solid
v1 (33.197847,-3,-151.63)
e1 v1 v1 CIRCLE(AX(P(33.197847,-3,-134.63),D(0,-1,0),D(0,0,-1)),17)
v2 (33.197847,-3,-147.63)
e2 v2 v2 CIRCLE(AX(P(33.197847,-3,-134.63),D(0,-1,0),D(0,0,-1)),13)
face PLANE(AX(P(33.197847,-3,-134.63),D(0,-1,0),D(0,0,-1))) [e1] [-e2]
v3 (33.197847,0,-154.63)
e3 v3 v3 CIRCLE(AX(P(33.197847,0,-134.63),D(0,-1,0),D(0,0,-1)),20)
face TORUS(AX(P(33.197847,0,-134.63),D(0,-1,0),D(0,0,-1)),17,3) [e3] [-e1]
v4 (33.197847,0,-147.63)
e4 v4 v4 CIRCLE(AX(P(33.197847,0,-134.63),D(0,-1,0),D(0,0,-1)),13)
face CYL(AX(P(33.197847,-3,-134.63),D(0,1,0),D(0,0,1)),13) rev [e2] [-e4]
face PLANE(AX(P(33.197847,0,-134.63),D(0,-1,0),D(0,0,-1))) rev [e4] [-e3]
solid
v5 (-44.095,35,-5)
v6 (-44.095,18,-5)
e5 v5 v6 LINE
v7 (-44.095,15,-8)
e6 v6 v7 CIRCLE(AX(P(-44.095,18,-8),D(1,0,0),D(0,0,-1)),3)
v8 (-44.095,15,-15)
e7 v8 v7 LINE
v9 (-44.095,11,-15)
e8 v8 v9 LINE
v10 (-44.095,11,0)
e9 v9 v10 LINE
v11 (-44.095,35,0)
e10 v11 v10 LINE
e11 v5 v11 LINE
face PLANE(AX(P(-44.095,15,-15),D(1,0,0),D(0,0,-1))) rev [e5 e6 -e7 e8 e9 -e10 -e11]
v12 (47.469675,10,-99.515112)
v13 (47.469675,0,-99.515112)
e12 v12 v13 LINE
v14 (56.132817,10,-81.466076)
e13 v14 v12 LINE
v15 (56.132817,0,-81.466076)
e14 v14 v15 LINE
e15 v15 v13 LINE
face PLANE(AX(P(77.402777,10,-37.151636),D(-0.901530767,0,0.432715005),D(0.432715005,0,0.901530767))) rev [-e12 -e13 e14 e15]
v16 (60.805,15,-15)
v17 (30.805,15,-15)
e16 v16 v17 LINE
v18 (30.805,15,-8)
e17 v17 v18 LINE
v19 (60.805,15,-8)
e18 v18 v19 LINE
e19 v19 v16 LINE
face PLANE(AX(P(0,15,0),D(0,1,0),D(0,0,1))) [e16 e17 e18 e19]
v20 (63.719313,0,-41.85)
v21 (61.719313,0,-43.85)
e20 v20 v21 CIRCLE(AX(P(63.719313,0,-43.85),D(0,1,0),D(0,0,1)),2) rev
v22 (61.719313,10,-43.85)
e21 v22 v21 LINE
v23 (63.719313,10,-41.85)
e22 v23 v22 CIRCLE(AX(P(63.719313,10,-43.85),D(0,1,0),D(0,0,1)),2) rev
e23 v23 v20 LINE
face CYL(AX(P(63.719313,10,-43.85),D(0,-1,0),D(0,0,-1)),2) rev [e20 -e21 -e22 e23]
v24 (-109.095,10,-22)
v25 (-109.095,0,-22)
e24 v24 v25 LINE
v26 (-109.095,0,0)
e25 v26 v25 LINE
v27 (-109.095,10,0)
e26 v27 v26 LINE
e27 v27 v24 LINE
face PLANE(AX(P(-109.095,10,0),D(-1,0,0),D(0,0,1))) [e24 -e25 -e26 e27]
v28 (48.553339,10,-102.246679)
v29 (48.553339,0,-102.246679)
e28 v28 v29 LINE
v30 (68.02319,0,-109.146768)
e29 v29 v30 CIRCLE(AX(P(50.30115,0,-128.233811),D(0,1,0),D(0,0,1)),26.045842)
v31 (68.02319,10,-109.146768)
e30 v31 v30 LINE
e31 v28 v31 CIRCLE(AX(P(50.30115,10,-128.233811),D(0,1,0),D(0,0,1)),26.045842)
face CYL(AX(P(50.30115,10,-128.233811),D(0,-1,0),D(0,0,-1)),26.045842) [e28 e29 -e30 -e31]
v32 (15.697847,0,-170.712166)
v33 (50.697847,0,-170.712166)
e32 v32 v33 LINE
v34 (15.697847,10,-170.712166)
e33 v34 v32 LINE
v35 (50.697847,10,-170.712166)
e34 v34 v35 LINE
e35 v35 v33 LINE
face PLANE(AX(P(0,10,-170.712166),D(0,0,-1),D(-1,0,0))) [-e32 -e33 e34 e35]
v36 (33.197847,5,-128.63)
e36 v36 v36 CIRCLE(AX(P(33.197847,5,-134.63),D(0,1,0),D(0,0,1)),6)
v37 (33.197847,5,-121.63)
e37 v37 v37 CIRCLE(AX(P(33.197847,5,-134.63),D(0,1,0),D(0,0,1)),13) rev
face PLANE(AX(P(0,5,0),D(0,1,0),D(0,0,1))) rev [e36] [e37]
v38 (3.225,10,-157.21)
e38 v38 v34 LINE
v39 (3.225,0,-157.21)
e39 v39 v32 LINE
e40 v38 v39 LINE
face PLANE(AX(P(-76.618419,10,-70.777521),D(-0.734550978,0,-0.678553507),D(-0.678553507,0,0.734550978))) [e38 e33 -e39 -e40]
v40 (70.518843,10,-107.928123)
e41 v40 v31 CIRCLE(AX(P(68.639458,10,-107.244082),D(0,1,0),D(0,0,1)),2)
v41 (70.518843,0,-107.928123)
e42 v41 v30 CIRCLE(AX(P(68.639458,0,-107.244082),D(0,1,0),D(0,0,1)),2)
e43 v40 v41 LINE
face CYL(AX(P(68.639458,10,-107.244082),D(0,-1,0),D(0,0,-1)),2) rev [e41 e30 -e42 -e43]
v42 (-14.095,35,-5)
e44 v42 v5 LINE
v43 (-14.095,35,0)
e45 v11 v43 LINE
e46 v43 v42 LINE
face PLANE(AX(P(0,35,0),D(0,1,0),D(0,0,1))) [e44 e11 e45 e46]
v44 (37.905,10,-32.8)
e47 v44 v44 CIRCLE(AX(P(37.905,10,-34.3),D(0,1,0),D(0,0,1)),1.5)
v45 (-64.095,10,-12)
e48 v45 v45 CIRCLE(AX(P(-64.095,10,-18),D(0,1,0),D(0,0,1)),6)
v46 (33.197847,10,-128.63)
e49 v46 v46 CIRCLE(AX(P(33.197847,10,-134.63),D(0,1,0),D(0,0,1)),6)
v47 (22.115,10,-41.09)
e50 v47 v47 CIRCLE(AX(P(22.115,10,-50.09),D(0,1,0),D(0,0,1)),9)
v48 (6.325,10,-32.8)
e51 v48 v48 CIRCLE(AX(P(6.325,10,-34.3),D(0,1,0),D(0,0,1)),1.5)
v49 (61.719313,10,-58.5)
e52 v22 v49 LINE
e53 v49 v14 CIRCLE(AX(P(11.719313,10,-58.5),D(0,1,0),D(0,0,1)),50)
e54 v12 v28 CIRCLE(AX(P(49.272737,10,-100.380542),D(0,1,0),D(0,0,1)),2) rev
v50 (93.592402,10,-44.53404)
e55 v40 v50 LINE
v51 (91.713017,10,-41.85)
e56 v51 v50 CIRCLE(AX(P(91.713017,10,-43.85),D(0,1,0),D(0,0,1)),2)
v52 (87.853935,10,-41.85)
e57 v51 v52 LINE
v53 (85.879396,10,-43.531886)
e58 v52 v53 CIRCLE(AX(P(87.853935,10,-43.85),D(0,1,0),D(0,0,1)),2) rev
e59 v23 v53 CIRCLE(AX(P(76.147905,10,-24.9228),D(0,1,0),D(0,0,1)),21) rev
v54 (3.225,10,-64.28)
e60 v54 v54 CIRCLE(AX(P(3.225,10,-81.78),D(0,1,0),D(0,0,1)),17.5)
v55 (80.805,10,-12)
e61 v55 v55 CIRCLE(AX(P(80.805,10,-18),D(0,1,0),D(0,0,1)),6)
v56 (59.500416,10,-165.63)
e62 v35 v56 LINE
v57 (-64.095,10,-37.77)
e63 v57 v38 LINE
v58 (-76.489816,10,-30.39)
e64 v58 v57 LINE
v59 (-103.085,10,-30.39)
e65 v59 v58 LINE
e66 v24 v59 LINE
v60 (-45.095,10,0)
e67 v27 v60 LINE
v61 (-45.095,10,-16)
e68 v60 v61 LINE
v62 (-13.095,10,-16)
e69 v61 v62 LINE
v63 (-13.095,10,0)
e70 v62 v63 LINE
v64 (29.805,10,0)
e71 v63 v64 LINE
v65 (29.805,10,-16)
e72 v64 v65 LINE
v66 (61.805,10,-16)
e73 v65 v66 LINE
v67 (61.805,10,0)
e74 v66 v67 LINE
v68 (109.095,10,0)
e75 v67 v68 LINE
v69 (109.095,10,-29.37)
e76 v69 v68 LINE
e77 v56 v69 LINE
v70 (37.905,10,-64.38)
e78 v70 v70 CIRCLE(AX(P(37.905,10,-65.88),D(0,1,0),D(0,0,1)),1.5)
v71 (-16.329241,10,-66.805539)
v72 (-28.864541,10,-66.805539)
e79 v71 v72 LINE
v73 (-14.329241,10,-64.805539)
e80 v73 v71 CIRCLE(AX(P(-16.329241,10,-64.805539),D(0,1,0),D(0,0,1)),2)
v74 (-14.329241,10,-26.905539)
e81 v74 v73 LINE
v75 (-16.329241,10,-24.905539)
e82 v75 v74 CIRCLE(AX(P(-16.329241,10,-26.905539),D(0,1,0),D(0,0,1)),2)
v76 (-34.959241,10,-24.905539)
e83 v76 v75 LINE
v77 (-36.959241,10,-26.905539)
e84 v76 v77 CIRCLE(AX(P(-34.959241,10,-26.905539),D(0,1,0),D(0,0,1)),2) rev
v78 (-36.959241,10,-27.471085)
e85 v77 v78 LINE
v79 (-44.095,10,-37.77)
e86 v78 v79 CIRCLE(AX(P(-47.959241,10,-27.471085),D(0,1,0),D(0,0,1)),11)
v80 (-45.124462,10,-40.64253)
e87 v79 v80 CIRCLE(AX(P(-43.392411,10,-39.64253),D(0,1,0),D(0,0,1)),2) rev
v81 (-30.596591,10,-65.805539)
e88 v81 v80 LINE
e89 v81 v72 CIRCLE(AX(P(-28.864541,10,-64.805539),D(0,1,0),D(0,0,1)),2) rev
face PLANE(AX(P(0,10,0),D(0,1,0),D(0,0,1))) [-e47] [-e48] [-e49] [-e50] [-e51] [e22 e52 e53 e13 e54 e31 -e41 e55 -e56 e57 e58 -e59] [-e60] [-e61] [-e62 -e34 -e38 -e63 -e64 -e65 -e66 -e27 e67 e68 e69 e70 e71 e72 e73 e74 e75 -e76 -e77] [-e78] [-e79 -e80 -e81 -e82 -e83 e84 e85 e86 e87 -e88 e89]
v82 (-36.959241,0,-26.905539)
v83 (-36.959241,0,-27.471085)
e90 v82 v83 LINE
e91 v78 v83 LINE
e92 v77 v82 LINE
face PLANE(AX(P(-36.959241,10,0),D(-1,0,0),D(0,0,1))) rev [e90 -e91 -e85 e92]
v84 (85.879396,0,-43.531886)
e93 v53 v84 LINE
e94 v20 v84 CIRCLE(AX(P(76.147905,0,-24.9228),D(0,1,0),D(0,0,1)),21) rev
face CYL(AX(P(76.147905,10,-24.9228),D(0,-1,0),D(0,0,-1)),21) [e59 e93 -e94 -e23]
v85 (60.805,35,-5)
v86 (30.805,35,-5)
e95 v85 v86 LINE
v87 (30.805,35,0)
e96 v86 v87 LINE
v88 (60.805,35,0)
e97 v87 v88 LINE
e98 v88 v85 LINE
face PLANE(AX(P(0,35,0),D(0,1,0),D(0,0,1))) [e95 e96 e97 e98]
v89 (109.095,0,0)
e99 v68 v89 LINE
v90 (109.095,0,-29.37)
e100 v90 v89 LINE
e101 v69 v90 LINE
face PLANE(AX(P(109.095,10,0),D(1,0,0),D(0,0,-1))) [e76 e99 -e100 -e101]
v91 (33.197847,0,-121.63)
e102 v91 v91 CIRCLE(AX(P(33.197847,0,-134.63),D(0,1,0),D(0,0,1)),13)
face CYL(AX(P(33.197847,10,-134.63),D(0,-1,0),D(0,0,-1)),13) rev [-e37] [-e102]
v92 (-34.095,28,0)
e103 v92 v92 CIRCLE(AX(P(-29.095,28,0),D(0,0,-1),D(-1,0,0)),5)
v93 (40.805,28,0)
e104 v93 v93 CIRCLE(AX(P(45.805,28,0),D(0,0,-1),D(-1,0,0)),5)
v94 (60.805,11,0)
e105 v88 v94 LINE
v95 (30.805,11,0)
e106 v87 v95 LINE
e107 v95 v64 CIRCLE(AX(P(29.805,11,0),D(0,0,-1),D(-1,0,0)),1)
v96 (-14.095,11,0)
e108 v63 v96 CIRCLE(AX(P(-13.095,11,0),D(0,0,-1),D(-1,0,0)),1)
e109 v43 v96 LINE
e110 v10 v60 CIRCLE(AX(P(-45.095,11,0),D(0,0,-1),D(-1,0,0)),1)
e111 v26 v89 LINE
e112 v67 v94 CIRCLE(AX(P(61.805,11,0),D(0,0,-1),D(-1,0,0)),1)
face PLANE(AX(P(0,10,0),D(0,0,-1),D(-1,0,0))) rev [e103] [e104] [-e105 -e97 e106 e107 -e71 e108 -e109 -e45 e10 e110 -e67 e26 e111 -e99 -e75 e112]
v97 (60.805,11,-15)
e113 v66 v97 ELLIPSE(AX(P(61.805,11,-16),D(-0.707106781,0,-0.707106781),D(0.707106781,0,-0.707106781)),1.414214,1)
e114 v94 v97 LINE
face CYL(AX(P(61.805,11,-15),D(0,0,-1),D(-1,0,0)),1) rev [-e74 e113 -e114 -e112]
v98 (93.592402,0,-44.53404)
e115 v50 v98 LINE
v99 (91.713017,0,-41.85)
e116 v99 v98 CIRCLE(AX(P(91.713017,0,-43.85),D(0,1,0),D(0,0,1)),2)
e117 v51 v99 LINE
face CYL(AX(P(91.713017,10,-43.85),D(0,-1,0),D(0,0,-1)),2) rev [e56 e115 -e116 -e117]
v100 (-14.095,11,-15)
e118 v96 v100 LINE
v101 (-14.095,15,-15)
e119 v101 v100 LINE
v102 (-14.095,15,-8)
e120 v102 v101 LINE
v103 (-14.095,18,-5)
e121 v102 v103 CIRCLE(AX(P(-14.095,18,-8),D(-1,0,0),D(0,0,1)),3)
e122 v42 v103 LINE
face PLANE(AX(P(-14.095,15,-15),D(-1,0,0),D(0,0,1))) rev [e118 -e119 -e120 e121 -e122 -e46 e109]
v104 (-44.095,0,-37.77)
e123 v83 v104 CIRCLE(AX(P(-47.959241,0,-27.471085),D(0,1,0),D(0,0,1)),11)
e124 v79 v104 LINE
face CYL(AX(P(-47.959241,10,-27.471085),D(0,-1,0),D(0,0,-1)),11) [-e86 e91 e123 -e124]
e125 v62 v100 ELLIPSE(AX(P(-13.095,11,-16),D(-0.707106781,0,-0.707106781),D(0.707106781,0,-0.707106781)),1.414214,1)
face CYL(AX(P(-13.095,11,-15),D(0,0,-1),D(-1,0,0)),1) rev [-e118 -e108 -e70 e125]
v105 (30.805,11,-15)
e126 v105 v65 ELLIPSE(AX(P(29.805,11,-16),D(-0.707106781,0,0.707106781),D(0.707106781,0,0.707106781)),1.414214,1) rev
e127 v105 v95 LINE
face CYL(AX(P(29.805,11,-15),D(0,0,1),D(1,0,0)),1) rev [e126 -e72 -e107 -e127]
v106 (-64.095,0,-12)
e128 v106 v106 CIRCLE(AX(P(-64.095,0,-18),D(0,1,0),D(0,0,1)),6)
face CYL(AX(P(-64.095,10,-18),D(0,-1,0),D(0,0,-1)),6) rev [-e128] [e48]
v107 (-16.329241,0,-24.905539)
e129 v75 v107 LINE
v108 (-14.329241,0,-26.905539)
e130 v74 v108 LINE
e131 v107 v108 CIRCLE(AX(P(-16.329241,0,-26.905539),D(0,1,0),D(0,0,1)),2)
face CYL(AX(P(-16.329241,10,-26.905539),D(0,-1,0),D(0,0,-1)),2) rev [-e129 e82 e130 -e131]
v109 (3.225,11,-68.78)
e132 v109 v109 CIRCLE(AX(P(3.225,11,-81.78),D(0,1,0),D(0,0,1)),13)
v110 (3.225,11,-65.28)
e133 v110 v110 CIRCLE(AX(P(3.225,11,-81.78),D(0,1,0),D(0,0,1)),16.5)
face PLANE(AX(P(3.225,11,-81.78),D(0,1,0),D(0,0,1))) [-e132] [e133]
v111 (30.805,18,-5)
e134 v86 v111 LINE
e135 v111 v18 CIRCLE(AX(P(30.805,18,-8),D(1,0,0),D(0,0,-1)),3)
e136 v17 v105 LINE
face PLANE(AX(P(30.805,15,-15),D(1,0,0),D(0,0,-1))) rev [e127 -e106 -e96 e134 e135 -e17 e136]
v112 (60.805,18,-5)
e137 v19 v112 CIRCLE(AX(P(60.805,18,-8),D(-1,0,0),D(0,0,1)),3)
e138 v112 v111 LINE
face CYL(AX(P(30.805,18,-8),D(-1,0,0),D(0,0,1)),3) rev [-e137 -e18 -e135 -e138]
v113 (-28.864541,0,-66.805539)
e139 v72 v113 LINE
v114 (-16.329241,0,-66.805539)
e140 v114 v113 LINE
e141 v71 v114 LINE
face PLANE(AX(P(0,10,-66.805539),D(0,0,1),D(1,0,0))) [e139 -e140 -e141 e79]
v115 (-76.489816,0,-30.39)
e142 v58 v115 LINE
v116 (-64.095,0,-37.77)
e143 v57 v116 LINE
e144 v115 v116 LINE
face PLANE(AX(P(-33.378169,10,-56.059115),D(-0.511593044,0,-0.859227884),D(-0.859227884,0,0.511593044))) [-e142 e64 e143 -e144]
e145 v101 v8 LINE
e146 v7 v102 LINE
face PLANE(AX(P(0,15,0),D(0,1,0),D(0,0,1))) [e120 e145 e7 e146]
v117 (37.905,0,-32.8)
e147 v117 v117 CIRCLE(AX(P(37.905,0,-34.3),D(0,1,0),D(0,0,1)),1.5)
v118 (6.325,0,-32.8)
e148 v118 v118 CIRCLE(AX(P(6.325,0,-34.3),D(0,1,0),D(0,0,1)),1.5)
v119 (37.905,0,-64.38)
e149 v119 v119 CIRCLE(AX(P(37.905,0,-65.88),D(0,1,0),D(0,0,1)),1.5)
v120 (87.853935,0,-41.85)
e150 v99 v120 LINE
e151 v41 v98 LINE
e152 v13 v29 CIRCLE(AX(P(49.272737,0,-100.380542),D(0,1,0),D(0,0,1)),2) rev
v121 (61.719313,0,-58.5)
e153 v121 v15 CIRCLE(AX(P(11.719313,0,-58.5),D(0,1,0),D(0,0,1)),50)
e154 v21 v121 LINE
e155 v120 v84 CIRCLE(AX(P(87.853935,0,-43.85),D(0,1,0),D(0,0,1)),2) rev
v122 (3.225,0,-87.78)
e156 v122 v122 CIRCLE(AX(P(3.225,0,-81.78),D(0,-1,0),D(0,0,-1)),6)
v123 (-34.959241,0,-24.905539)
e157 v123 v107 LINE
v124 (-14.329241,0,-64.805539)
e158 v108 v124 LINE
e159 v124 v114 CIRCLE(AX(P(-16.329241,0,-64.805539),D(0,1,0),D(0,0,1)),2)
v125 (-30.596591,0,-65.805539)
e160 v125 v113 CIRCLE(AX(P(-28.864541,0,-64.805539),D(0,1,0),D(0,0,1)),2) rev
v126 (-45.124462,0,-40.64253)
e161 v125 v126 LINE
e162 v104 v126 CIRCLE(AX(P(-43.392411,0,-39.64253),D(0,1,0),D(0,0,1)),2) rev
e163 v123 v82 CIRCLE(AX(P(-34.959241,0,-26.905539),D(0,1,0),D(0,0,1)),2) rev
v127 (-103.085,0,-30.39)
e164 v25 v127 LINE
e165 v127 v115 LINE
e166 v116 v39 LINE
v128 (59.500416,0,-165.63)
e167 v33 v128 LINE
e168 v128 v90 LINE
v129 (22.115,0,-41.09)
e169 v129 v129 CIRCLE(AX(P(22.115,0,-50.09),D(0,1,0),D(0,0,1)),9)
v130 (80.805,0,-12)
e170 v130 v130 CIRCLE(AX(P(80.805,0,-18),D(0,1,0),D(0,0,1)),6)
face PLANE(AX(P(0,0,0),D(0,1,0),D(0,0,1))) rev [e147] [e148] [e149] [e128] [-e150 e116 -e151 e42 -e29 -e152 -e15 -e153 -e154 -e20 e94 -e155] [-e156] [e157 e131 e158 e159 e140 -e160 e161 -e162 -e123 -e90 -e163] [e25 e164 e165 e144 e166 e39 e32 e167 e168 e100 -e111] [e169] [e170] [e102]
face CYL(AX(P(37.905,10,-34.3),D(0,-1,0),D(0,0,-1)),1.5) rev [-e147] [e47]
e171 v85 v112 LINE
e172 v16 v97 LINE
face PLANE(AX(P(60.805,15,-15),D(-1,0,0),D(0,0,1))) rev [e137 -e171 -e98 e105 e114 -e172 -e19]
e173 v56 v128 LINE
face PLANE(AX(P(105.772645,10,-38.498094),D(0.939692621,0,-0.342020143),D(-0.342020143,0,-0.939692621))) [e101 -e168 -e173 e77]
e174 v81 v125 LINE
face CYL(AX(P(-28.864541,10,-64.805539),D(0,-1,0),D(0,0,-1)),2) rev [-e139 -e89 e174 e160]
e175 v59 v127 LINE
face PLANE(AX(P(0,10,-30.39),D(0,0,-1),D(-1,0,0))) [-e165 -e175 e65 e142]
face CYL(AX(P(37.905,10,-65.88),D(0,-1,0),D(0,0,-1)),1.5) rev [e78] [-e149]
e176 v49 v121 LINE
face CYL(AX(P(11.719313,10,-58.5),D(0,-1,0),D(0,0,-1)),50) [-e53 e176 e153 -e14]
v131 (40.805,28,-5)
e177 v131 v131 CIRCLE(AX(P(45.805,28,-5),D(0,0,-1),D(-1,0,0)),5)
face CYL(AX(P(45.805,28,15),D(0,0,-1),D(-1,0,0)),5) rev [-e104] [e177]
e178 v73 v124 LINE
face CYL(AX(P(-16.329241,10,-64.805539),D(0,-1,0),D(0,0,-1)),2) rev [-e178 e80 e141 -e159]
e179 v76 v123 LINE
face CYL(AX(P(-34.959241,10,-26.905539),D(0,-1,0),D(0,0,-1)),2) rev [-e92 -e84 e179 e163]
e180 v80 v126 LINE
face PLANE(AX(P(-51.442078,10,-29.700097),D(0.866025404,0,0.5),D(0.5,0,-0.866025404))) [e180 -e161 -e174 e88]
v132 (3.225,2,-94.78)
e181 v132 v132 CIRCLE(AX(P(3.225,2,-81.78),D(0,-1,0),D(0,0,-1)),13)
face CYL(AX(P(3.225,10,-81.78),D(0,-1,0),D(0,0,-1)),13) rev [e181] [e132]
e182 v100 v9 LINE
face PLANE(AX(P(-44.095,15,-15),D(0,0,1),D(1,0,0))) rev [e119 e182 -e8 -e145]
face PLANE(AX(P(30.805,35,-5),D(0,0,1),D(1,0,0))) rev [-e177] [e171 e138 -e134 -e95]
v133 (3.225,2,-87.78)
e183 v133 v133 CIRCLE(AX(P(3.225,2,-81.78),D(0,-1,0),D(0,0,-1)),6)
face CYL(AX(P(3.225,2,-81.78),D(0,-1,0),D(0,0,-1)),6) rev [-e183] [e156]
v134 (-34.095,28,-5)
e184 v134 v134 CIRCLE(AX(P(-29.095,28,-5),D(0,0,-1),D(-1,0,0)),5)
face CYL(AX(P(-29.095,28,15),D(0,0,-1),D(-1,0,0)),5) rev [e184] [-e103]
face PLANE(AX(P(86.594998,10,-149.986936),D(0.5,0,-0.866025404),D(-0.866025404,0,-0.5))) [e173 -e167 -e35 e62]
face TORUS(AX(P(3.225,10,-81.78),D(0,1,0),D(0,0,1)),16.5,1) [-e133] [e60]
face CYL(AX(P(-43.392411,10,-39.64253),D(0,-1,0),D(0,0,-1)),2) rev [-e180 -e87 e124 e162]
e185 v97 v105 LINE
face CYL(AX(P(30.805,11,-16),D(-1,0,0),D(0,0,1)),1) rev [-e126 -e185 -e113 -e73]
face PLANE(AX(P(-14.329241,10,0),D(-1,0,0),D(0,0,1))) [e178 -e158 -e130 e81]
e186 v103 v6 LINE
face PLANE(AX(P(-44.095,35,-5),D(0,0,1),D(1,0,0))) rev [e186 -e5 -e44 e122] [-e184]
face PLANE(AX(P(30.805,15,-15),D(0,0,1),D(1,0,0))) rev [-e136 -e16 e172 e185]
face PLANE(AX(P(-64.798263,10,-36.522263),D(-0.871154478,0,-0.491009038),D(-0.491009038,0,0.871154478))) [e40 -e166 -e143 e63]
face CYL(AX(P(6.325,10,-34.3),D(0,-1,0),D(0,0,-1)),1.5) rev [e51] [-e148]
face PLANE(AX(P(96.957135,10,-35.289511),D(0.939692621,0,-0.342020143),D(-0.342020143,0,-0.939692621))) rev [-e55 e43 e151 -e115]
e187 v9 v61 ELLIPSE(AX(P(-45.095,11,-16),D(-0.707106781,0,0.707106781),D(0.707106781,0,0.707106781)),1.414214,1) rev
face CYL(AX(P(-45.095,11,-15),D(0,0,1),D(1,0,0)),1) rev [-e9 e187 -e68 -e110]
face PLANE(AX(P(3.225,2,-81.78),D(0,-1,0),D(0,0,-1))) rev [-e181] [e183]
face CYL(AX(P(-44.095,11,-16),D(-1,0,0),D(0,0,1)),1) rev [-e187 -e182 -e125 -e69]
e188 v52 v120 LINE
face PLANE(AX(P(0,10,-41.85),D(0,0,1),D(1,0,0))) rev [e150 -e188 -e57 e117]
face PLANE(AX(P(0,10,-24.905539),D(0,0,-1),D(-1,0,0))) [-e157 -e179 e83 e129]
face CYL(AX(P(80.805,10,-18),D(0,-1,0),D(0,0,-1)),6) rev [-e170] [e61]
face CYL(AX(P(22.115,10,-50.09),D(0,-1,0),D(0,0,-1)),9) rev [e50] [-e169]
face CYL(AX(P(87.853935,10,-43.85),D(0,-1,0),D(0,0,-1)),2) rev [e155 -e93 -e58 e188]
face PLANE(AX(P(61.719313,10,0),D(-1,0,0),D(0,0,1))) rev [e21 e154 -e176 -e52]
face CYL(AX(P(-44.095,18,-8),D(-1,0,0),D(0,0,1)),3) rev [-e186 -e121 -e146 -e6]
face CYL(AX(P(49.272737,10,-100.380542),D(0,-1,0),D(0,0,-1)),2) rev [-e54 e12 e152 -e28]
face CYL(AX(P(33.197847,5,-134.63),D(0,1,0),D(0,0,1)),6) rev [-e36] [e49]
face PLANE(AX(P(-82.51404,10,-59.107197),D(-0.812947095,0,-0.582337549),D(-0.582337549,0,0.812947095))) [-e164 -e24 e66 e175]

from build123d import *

# Parameters (mm, degrees)
CROQUIS1_R              = 13
CROQUIS1_R_2            = 6
CROQUIS1_R_3            = 9
CROQUIS1_R_4            = 1.5
SALIENTE_EXTRUIR1_DEPTH = 10
CROQUIS2_W              = 30
CROQUIS2_H              = 15
SALIENTE_EXTRUIR2_DEPTH = 5
CROQUIS3_W              = 30
CROQUIS3_H              = 5
SALIENTE_EXTRUIR3_DEPTH = 20
CROQUIS4_R              = 5
CORTAR_EXTRUIR1_DEPTH   = 20
REDONDEO1_R             = 1
REDONDEO2_R             = 1
REDONDEO3_R             = 3
SALIENTE_EXTRUIR4_START = -5
CROQUIS6_R              = 13
CROQUIS6_R_2            = 6
SALIENTE_EXTRUIR4_DEPTH = 5
CROQUIS7_R              = 20
CROQUIS7_R_2            = 13
SALIENTE_EXTRUIR6_DEPTH = 3
REDONDEO5_R             = 3
CROQUIS8_R              = 13
CROQUIS8_R_2            = 6
SALIENTE_EXTRUIR7_DEPTH = 2
CROQUIS9_R              = 17.5
CROQUIS9_R_2            = 13
SALIENTE_EXTRUIR8_DEPTH = 1
REDONDEO6_R             = 1


with BuildPart() as part:
    # Croquis1 → Saliente-Extruir1 (new body)
    with BuildSketch(Plane(origin=(0, 0, 0), x_dir=(1, 0, 0), z_dir=(0, 1, 0))):
        Polygon((-109.095, 0), (109.095, 0), (109.095, 29.37), (59.500415879, 165.63), (50.697846821, 170.712165615), (15.697846821, 170.712165615), (3.225, 157.21), (-64.095, 37.77), (-76.489816261, 30.39), (-103.085, 30.39), (-109.095, 22), align=None)
        with Locations(Location((33.197846821, 134.63, 0), (0, 0, 270))):
            Circle(CROQUIS1_R, mode=Mode.SUBTRACT)
        with Locations(Location((3.225, 81.78, 0), (0, 0, 270))):
            Circle(CROQUIS1_R, mode=Mode.SUBTRACT)
        with Locations(Location((-64.095, 18, 0), (0, 0, 270))):
            Circle(CROQUIS1_R_2, mode=Mode.SUBTRACT)
        with Locations(Location((80.805, 18, 0), (0, 0, 270))):
            Circle(CROQUIS1_R_2, mode=Mode.SUBTRACT)
        with Locations(Location((22.115, 50.09, 0), (0, 0, 270))):
            Circle(CROQUIS1_R_3, mode=Mode.SUBTRACT)
        with Locations(Location((37.905, 65.88, 0), (0, 0, 270))):
            Circle(CROQUIS1_R_4, mode=Mode.SUBTRACT)
        with Locations(Location((37.905, 34.3, 0), (0, 0, 270))):
            Circle(CROQUIS1_R_4, mode=Mode.SUBTRACT)
        with Locations(Location((6.325, 34.3, 0), (0, 0, 270))):
            Circle(CROQUIS1_R_4, mode=Mode.SUBTRACT)
        with BuildLine():
            Line((-34.959241143, 24.905539046), (-16.329241143, 24.905539046))
            ThreePointArc((-16.329241143, 24.905539046), (-14.915027581, 25.491325484), (-14.329241143, 26.905539046))
            Line((-14.329241143, 26.905539046), (-14.329241143, 64.805539046))
            ThreePointArc((-14.329241143, 64.805539046), (-14.915027581, 66.219752609), (-16.329241143, 66.805539046))
            Line((-16.329241143, 66.805539046), (-28.864540605, 66.805539046))
            ThreePointArc((-28.864540605, 66.805539046), (-29.864540605, 66.537589854), (-30.596591412, 65.805539046))
            Line((-30.596591412, 65.805539046), (-45.124461509, 40.642529914))
            ThreePointArc((-45.124461509, 40.642529914), (-45.275154746, 38.967789325), (-44.095, 37.77))
            ThreePointArc((-44.095, 37.77), (-38.917486541, 33.735802046), (-36.959241143, 27.471085475))
            Line((-36.959241143, 27.471085475), (-36.959241143, 26.905539046))
            ThreePointArc((-36.959241143, 26.905539046), (-36.373454706, 25.491325484), (-34.959241143, 24.905539046))
        make_face(mode=Mode.SUBTRACT)
        with BuildLine():
            Line((70.518843068, 107.928122629), (93.592402069, 44.534040287))
            ThreePointArc((93.592402069, 44.534040287), (93.351320916, 42.702847127), (91.713016828, 41.85))
            Line((91.713016828, 41.85), (87.853935228, 41.85))
            ThreePointArc((87.853935228, 41.85), (86.557059698, 42.32746466), (85.879396403, 43.53188614))
            ThreePointArc((85.879396403, 43.53188614), (74.558636842, 45.862576394), (63.719312841, 41.85))
            ThreePointArc((63.719312841, 41.85), (62.305099279, 42.435786438), (61.719312841, 43.85))
            Line((61.719312841, 43.85), (61.719312841, 58.5))
            ThreePointArc((61.719312841, 58.5), (60.302618614, 70.31788476), (56.132816833, 81.466076355))
            Line((56.132816833, 81.466076355), (47.469675424, 99.515111912))
            ThreePointArc((47.469675424, 99.515111912), (47.413687511, 101.118061517), (48.553338923, 102.246678699))
            ThreePointArc((48.553338923, 102.246678699), (59.00154122, 103.684084154), (68.023190025, 109.146768338))
            ThreePointArc((68.023190025, 109.146768338), (69.517034466, 109.041263258), (70.518843068, 107.928122629))
        make_face(mode=Mode.SUBTRACT)
    extrude(amount=SALIENTE_EXTRUIR1_DEPTH)

    # Croquis2 → Saliente-Extruir2 (add)
    with BuildSketch(Plane(origin=(0, 10, 0), x_dir=(1, 0, 0), z_dir=(0, 1, 0))):
        with Locations((-29.095, 7.5)):
            Rectangle(CROQUIS2_W, CROQUIS2_H)
        with Locations((45.805, 7.5)):
            Rectangle(CROQUIS2_W, CROQUIS2_H)
    extrude(amount=SALIENTE_EXTRUIR2_DEPTH)

    # Croquis3 → Saliente-Extruir3 (add)
    with BuildSketch(Plane(origin=(0, 15, 0), x_dir=(1, 0, 0), z_dir=(0, 1, 0))):
        with Locations((-29.095, 2.5)):
            Rectangle(CROQUIS3_W, CROQUIS3_H)
        with Locations((45.805, 2.5)):
            Rectangle(CROQUIS3_W, CROQUIS3_H)
    extrude(amount=SALIENTE_EXTRUIR3_DEPTH)

    # Croquis4 → Cortar-Extruir1 (cut)
    with BuildSketch(Plane(origin=(0, 0, -5), x_dir=(-1, 0, 0), z_dir=(0, 0, -1))):
        with Locations((-45.805, 28)):
            Circle(CROQUIS4_R)
        with Locations((29.095, 28)):
            Circle(CROQUIS4_R)
    extrude(amount=-CORTAR_EXTRUIR1_DEPTH, mode=Mode.SUBTRACT)

    # Redondeo1
    redondeo1_edges = [part.edges().sort_by_distance(p)[0] for p in [
        (-14.095, 10, -7.5),
        (-44.095, 10, -7.5),
        (60.805, 10, -7.5),
        (30.805, 10, -7.5),
    ]]
    fillet(redondeo1_edges, radius=REDONDEO1_R)

    # Redondeo2
    redondeo2_edges = [part.edges().sort_by_distance(p)[0] for p in [
        (45.805, 10, -15),
        (-29.095, 10, -15),
    ]]
    fillet(redondeo2_edges, radius=REDONDEO2_R)

    # Redondeo3
    redondeo3_edges = [part.edges().sort_by_distance(p)[0] for p in [
        (-29.095, 15, -5),
        (45.805, 15, -5),
    ]]
    fillet(redondeo3_edges, radius=REDONDEO3_R)

    # Croquis6 → Saliente-Extruir4 (add)
    with BuildSketch(Plane(origin=(0, 10, 0), x_dir=(1, 0, 0), z_dir=(0, 1, 0)).offset(SALIENTE_EXTRUIR4_START)):
        with Locations(Location((33.197846821, 134.63, 0), (0, 0, 270))):
            Circle(CROQUIS6_R)
        with Locations(Location((33.197846821, 134.63, 0), (0, 0, 270))):
            Circle(CROQUIS6_R_2, mode=Mode.SUBTRACT)
    extrude(amount=SALIENTE_EXTRUIR4_DEPTH)

    # Croquis8 → Saliente-Extruir7 (add)
    with BuildSketch(Plane.XZ):
        with Locations(Location((3.225, -81.78, 0), (0, 0, 270))):
            Circle(CROQUIS8_R)
        with Locations(Location((3.225, -81.78, 0), (0, 0, 270))):
            Circle(CROQUIS8_R_2, mode=Mode.SUBTRACT)
    extrude(amount=-SALIENTE_EXTRUIR7_DEPTH)

    # Croquis9 → Saliente-Extruir8 (add)
    with BuildSketch(Plane(origin=(0, 10, 0), x_dir=(1, 0, 0), z_dir=(0, 1, 0))):
        with Locations(Location((3.225, 81.78, 0), (0, 0, 270))):
            Circle(CROQUIS9_R)
        with Locations(Location((3.225, 81.78, 0), (0, 0, 90))):
            Circle(CROQUIS9_R_2, mode=Mode.SUBTRACT)
    extrude(amount=SALIENTE_EXTRUIR8_DEPTH)

    # Redondeo6
    redondeo6_edges = [part.edges().sort_by_distance(p)[0] for p in [
        (3.225, 11, -99.28),
    ]]
    fillet(redondeo6_edges, radius=REDONDEO6_R - 0.0001)  # a hair under: the kernel refuses the full size


with BuildPart() as body_2:
    # Croquis7 → Saliente-Extruir6 (new body)
    with BuildSketch(Plane.XZ):
        with Locations(Location((33.197846821, -134.63, 0), (0, 0, 270))):
            Circle(CROQUIS7_R)
        with Locations(Location((33.197846821, -134.63, 0), (0, 0, 270))):
            Circle(CROQUIS7_R_2, mode=Mode.SUBTRACT)
    extrude(amount=SALIENTE_EXTRUIR6_DEPTH)

    # Redondeo5
    redondeo5_edges = [body_2.edges().sort_by_distance(p)[0] for p in [
        (33.197846821, -3, -114.63),
    ]]
    fillet(redondeo5_edges, radius=REDONDEO5_R - 0.0001)  # a hair under: the kernel refuses the full size


solid = Compound([part.part, body_2.part])
